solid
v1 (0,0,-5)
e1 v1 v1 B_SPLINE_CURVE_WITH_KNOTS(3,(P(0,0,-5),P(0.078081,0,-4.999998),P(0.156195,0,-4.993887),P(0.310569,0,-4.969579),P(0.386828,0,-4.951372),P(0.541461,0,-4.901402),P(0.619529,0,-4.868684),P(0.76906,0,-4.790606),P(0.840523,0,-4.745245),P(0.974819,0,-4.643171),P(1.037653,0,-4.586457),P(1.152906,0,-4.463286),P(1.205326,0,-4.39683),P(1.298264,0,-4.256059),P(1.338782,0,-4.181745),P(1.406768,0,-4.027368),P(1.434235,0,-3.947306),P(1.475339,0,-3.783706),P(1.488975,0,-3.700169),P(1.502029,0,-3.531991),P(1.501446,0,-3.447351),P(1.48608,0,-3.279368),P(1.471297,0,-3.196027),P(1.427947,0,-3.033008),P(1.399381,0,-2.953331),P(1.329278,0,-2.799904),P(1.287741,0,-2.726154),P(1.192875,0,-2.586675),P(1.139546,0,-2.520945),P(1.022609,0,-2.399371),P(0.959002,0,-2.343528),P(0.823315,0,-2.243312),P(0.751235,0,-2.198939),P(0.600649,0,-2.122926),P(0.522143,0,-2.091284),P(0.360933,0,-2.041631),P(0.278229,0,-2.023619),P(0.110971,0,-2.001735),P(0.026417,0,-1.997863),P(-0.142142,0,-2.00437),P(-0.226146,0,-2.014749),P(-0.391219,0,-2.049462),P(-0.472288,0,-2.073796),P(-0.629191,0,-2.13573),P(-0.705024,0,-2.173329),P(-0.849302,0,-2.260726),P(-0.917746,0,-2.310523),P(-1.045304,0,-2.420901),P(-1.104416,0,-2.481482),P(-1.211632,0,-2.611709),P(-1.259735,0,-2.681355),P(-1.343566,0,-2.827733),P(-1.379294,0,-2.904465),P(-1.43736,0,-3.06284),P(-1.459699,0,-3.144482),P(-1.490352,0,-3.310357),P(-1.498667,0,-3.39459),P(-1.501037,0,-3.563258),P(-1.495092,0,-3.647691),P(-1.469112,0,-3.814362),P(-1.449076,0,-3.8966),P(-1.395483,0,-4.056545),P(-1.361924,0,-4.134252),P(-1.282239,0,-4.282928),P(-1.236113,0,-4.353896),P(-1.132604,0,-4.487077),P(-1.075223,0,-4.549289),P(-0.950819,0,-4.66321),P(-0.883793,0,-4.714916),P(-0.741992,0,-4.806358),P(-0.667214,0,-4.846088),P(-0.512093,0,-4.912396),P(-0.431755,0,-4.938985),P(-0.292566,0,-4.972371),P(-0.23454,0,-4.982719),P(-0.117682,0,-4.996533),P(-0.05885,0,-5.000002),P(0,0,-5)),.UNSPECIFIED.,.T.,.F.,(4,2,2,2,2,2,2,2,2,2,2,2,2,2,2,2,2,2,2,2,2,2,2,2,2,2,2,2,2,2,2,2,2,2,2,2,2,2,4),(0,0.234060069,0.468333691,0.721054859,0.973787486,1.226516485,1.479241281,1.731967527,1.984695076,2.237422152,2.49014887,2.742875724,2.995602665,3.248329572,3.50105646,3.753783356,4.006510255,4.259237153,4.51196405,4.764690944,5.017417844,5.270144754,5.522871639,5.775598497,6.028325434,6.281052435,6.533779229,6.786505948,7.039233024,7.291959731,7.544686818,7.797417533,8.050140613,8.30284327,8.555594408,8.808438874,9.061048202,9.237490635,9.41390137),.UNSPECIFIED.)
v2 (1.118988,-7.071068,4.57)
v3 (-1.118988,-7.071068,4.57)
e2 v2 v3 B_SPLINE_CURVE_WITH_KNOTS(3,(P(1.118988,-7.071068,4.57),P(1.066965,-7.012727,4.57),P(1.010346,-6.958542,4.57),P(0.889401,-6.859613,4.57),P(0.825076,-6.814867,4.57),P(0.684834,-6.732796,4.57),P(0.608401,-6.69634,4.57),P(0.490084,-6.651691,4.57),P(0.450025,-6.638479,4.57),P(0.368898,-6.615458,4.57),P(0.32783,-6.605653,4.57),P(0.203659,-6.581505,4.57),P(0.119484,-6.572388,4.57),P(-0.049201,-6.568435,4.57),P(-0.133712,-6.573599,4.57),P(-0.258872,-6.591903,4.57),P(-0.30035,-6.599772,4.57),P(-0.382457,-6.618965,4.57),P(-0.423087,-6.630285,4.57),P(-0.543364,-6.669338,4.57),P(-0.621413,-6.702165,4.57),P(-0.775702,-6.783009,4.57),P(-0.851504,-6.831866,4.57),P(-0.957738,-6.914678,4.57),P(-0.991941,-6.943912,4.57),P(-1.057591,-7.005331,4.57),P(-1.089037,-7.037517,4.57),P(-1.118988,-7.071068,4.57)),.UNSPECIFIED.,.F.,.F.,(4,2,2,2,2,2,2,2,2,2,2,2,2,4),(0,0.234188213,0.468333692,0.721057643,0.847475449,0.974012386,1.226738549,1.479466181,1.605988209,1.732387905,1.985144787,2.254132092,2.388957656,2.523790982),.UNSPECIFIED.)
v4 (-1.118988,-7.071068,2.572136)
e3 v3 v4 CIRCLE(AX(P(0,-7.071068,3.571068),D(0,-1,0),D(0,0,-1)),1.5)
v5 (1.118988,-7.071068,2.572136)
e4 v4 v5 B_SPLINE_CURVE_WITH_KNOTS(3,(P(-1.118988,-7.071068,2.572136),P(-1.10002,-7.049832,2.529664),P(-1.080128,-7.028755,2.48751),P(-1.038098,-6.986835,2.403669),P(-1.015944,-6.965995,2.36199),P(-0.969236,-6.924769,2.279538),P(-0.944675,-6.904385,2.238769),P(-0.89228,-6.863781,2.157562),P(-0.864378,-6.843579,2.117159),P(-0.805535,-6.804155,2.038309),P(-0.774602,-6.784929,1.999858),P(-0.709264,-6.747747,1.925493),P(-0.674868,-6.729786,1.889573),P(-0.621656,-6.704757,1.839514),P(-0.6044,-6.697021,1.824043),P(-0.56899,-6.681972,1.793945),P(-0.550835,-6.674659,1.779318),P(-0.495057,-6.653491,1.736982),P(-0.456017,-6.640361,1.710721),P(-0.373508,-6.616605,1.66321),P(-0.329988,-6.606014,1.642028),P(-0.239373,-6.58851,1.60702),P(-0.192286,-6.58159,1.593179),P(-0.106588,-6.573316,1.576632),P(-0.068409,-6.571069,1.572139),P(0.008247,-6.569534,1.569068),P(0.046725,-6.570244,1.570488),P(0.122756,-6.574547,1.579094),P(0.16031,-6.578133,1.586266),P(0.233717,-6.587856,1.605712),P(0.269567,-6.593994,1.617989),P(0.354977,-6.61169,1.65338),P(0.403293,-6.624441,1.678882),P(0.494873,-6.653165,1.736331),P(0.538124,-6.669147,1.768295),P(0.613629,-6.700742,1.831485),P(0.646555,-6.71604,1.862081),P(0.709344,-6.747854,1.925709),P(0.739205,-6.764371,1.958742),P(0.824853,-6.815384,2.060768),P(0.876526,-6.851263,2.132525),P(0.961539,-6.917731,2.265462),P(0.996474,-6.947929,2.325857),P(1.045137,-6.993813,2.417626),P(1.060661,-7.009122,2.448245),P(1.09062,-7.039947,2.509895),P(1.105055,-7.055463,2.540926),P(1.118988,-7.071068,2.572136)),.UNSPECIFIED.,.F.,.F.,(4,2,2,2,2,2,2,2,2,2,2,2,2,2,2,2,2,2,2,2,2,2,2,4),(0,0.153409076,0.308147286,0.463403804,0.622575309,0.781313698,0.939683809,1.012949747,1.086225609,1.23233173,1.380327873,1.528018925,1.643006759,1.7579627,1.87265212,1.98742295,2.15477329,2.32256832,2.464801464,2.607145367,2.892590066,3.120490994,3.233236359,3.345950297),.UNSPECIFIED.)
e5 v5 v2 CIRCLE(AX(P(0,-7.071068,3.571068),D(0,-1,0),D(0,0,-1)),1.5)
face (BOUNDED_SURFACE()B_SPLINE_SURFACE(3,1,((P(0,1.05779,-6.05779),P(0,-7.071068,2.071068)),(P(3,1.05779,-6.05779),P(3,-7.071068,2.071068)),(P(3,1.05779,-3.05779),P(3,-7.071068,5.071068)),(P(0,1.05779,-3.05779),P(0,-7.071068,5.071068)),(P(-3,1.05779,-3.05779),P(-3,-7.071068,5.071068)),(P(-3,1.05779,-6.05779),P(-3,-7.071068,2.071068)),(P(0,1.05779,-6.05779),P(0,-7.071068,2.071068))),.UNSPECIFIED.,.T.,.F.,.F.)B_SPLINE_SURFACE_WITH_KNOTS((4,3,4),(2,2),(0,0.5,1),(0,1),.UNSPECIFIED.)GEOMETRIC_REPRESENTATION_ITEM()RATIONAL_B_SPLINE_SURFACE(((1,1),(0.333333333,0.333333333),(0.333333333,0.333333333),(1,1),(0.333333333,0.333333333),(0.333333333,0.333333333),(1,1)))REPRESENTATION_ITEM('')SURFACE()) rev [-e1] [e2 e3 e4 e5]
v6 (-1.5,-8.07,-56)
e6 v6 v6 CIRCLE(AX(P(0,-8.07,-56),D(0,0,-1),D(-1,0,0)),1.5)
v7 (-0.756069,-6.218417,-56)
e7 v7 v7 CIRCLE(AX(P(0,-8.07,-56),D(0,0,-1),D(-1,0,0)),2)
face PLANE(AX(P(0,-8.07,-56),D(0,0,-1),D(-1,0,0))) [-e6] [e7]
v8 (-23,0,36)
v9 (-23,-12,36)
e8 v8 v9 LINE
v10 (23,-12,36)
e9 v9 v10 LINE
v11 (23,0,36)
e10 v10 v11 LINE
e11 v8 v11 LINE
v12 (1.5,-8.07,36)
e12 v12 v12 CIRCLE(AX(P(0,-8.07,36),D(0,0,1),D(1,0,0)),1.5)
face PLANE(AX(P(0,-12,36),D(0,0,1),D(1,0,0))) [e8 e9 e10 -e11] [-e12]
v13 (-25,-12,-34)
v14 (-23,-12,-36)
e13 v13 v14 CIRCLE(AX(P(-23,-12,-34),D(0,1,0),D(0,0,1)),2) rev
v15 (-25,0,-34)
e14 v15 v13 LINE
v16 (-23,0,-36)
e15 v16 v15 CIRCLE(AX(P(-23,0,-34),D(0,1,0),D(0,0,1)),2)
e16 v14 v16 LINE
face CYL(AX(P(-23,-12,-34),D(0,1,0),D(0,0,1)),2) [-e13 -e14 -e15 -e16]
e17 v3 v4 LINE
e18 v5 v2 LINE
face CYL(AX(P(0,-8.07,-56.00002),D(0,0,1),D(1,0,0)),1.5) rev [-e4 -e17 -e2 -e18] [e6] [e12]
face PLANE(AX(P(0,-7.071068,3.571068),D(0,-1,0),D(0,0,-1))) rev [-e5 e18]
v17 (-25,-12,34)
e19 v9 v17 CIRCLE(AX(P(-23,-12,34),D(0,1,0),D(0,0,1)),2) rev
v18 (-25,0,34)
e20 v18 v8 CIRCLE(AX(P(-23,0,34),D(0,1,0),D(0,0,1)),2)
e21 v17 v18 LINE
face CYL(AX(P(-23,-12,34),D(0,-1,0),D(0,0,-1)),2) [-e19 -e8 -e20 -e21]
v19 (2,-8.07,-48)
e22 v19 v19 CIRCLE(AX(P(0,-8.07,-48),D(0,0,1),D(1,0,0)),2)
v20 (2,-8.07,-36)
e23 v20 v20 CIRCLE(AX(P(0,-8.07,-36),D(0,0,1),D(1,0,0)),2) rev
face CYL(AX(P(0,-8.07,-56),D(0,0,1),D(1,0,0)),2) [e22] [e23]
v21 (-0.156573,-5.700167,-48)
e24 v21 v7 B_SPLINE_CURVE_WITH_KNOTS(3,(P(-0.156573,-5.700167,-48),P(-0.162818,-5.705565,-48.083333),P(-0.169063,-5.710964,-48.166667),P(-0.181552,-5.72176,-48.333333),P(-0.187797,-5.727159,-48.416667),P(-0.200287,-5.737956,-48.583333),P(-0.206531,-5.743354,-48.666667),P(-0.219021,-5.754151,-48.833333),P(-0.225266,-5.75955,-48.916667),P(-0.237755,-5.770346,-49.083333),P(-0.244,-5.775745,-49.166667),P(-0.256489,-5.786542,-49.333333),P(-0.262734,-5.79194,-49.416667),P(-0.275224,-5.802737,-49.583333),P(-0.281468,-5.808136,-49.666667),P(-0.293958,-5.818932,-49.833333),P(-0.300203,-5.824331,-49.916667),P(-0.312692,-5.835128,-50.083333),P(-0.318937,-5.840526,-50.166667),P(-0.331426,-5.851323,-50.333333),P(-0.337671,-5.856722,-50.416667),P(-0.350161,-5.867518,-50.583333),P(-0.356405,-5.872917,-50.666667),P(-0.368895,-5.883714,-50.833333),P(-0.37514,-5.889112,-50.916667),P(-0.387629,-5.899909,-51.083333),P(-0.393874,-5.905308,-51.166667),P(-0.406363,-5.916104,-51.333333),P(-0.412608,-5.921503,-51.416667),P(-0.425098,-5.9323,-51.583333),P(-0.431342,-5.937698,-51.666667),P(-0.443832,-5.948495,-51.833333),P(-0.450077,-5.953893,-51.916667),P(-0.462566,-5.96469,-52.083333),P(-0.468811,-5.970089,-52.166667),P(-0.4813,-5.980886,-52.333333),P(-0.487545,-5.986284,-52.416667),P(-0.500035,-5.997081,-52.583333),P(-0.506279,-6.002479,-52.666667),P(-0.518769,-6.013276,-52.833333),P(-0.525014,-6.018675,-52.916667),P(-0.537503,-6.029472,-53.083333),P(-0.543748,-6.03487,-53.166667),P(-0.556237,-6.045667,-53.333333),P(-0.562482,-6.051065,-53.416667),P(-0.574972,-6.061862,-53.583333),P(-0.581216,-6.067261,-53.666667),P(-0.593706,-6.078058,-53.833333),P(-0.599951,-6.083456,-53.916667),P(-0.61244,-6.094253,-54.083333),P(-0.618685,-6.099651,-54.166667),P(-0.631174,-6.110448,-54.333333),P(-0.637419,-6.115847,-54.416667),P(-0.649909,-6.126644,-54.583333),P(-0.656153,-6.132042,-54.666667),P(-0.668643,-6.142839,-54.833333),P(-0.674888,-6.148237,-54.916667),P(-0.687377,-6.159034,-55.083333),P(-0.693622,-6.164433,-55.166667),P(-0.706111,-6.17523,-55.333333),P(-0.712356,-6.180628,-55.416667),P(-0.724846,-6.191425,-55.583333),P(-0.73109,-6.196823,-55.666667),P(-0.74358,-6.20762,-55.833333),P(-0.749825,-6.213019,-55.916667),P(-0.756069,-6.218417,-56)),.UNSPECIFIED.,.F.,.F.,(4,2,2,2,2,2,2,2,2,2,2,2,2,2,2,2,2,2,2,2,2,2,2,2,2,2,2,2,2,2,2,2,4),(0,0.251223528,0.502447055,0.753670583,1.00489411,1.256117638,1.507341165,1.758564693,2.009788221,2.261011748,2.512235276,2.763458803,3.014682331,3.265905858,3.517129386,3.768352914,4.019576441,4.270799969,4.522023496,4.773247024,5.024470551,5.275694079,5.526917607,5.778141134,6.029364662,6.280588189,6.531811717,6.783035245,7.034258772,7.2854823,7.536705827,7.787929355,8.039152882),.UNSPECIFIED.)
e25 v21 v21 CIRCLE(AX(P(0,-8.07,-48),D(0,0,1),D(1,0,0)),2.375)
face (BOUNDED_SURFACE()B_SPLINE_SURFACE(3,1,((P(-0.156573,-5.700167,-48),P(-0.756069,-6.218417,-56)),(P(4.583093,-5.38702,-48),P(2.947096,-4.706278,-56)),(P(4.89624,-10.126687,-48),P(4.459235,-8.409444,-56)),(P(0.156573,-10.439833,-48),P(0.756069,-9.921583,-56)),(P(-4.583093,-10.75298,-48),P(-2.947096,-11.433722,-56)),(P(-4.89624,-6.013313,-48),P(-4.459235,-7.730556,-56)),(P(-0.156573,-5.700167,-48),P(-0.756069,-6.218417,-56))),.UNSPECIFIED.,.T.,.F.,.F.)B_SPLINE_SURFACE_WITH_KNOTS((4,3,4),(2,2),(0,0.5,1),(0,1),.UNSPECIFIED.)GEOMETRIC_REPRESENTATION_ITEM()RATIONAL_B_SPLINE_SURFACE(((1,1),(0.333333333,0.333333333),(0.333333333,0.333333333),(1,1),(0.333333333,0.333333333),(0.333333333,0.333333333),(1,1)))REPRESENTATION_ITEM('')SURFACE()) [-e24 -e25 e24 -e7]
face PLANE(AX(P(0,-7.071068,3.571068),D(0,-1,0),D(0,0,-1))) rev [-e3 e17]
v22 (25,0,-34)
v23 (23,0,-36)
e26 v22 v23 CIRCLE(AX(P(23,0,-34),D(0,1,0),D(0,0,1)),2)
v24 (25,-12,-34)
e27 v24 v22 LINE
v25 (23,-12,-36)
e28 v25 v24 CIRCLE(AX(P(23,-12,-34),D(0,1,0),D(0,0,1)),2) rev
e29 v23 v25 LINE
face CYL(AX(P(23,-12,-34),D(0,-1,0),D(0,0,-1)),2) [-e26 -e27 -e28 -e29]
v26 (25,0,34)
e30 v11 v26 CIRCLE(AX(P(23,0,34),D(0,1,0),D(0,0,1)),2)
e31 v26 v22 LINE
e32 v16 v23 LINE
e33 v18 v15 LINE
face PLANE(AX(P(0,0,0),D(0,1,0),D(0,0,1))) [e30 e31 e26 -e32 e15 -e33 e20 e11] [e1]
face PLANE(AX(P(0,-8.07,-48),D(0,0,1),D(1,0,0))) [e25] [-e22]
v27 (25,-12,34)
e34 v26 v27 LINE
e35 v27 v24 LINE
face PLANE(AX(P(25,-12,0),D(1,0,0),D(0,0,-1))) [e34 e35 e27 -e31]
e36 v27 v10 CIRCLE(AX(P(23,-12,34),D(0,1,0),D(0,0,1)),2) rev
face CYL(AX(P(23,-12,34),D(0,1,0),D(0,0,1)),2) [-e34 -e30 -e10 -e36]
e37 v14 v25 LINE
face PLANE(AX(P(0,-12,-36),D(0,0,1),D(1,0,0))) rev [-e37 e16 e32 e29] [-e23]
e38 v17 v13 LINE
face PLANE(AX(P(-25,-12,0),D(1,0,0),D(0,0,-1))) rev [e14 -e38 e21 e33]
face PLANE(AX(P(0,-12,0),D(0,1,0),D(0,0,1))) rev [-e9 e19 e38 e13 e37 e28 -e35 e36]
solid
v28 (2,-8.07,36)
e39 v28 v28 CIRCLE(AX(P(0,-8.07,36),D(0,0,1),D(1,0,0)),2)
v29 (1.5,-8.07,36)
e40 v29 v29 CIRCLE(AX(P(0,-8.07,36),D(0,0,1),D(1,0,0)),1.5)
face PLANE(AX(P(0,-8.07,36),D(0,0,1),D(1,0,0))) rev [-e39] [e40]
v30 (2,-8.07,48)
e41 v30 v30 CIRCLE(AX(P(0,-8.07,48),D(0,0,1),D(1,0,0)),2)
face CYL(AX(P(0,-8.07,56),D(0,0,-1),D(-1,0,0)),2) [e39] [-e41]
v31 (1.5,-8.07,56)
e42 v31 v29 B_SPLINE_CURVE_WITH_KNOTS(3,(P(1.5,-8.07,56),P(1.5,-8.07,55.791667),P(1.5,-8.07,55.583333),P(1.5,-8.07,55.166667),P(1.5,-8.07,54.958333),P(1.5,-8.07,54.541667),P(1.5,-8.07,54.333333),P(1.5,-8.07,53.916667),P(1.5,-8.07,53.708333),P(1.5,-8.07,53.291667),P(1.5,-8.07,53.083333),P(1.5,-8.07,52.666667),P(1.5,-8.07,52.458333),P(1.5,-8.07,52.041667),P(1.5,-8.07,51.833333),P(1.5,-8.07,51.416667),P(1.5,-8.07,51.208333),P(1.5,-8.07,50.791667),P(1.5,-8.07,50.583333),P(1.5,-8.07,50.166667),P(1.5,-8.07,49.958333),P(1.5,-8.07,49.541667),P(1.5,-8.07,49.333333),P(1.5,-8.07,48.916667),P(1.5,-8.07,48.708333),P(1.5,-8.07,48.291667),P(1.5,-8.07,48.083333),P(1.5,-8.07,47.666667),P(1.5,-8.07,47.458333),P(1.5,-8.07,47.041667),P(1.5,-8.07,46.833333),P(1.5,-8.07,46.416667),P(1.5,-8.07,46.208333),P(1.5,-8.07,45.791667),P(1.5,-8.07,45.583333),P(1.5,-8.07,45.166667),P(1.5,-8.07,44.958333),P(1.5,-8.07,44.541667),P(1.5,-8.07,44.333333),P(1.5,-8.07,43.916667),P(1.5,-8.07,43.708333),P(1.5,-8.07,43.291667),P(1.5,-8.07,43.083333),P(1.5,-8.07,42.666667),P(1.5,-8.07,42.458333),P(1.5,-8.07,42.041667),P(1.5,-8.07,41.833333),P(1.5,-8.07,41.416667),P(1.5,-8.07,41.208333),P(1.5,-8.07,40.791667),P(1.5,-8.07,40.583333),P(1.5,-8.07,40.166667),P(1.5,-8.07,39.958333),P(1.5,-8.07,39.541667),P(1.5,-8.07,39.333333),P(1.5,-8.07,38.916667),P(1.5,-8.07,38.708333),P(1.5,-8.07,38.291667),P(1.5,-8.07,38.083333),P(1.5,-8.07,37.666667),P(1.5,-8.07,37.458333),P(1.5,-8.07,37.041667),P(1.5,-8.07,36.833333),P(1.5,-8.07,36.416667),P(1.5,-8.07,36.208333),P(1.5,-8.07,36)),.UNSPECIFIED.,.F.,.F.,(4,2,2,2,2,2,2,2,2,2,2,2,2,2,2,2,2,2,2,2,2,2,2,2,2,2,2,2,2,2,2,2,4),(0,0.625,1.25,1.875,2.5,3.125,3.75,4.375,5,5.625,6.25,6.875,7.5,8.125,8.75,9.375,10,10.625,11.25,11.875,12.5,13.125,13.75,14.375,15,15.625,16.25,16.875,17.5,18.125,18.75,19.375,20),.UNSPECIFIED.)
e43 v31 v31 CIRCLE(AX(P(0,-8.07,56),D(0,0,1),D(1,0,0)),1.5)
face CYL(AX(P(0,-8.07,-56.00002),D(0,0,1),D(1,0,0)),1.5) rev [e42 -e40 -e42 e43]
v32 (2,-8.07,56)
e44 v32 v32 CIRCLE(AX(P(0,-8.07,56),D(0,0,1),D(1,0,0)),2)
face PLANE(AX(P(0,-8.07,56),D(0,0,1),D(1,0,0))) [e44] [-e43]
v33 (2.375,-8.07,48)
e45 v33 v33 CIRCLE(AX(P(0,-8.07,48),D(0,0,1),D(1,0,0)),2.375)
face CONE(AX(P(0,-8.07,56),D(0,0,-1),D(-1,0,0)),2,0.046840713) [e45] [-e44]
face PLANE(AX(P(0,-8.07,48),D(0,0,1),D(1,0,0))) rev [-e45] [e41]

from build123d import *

# Parameters (mm, degrees)
PLATFORM_W                   = 50
PLATFORM_H                   = 72
PLATFORM_W_2                 = 22.5
PLATFORM_H_2                 = 43
PLATFORM_HEIGHT_DEPTH        = 12
TUBE_INNER_DIAMETER_SKETCH_R = 1.5
FILLET1_R                    = 2
OUTER_DIAMETER_OF_LUMEN_1_R  = 2
TUBING_SIDE_1_DEPTH          = 20
OUTER_DIAMETER_OF_LUMEN_2_R  = 2
TUBING_SIDE_2_DEPTH          = 20
ADAPTER_1_SKETCH_R           = 2.375
LUMEN_INNER_DIAMETER_R       = 1.5
HOLLOWING_OUT_LUMEN_DEPTH    = 116.381974426


with BuildPart() as part:
    # Platform → Platform Height (new body)
    # profile 1 of 2: a face of its own
    with BuildSketch(Plane(origin=(0, 0, 0), x_dir=(1, 0, 0), z_dir=(0, 1, 0))):
        Rectangle(PLATFORM_W, PLATFORM_H)
        Rectangle(PLATFORM_W_2, PLATFORM_H_2, mode=Mode.SUBTRACT)
    # profile 2 of 2: a face of its own
    with BuildSketch(Plane(origin=(0, 0, 0), x_dir=(1, 0, 0), z_dir=(0, 1, 0))):
        Rectangle(PLATFORM_W_2, PLATFORM_H_2)
    extrude(amount=-PLATFORM_HEIGHT_DEPTH)

    # Tube Inner Diameter: sweep along a curve in space
    with BuildLine() as tube_inner_diameter_path:
        Line((0, 0, -3.5), (0, -7.071067812, 3.571067812))
    # Tube Inner Diameter Sketch → Tube Inner Diameter (sweep, cut)
    with BuildSketch(Plane(origin=(0, 0, 0), x_dir=(-1, 0, 0), z_dir=(0, -1, 0))):
        with Locations((0, 3.5)):
            Circle(TUBE_INNER_DIAMETER_SKETCH_R)
    sweep(path=tube_inner_diameter_path.line, mode=Mode.SUBTRACT)

    # Fillet1
    fillet1_edges = [part.edges().sort_by_distance(p)[0] for p in [
        (25, -6, 36),
        (-25, -6, 36),
        (-25, -6, -36),
        (25, -6, -36),
    ]]
    fillet(fillet1_edges, radius=FILLET1_R)

    # Outer Diameter of Lumen 2 → Tubing Side 2 (add)
    with BuildSketch(Plane(origin=(0, 0, -36), x_dir=(-1, 0, 0), z_dir=(0, 0, -1))):
        with Locations(Location((0, -8.07, 0), (0, 0, 180))):
            Circle(OUTER_DIAMETER_OF_LUMEN_2_R)
    extrude(amount=TUBING_SIDE_2_DEPTH)

    # Adapter #2: read off the stored shape, not the designer's step
    # Adapter #2: loft between two sections, ruled curve by curve
    adapter_2_from = [
        Edge.make_bspline([(-0.156573295, -5.700166714, -48), (4.583093277, -5.387020124, -48), (4.896239867, -10.126686696, -48), (0.156573295, -10.439833286, -48), (-4.583093277, -10.752979876, -48), (-4.896239867, -6.013313304, -48), (-0.156573295, -5.700166714, -48)], [0, 0, 0, 0, 0.5, 0.5, 0.5, 1, 1, 1, 1], 3, [1, 0.333333333, 0.333333333, 1, 0.333333333, 0.333333333, 1]),
    ]
    adapter_2_to = [
        Edge.make_bspline([(-0.756069385, -6.218417141, -56), (2.947096334, -4.706278371, -56), (4.459235104, -8.40944409, -56), (0.756069385, -9.921582859, -56), (-2.947096334, -11.433721629, -56), (-4.459235104, -7.73055591, -56), (-0.756069385, -6.218417141, -56)], [0, 0, 0, 0, 0.5, 0.5, 0.5, 1, 1, 1, 1], 3, [1, 0.333333333, 0.333333333, 1, 0.333333333, 0.333333333, 1]),
    ]
    adapter_2 = Solid(Shell([*[Face.make_surface_from_curves(adapter_2_from[k], adapter_2_to[k]) for k in range(1)], Face(Wire(adapter_2_from)), Face(Wire(adapter_2_to))]))
    add(adapter_2)


with BuildPart() as body_2:
    # Outer Diameter of Lumen 1 → Tubing Side 1 (new body)
    with BuildSketch(Plane.XY.offset(36)):
        with Locations((0, -8.07)):
            Circle(OUTER_DIAMETER_OF_LUMEN_1_R)
    extrude(amount=TUBING_SIDE_1_DEPTH)

    # Adapter #1 Sketch → section 0 of adapter_1
    with BuildSketch(Plane.XY.offset(48), mode=Mode.PRIVATE) as adapter_1_s0:
        with Locations((0, -8.07)):
            Circle(ADAPTER_1_SKETCH_R)
    # loft up to a face of the part (adapter_1)
    loft([adapter_1_s0.sketch, Face(Wire([body_2.edges().sort_by_distance((-1.369094212, -6.612062745, 56))[0]]))])


with BuildPart() as hollowing_out_lumen_tool:
    # Lumen Inner Diameter → Hollowing Out Lumen (new, through all)
    with BuildSketch(Plane.XY.offset(56)):
        with Locations((0, -8.07)):
            Circle(LUMEN_INNER_DIAMETER_R)
    extrude(amount=-HOLLOWING_OUT_LUMEN_DEPTH)


with BuildPart() as part_1:
    add(part.part)

    # Hollowing Out Lumen: cut by hollowing_out_lumen_tool
    add(hollowing_out_lumen_tool.part, mode=Mode.SUBTRACT)


with BuildPart() as body_2_1:
    add(body_2.part)

    # Hollowing Out Lumen: cut by hollowing_out_lumen_tool
    add(hollowing_out_lumen_tool.part, mode=Mode.SUBTRACT)


solid = Compound([part_1.part, body_2_1.part])
